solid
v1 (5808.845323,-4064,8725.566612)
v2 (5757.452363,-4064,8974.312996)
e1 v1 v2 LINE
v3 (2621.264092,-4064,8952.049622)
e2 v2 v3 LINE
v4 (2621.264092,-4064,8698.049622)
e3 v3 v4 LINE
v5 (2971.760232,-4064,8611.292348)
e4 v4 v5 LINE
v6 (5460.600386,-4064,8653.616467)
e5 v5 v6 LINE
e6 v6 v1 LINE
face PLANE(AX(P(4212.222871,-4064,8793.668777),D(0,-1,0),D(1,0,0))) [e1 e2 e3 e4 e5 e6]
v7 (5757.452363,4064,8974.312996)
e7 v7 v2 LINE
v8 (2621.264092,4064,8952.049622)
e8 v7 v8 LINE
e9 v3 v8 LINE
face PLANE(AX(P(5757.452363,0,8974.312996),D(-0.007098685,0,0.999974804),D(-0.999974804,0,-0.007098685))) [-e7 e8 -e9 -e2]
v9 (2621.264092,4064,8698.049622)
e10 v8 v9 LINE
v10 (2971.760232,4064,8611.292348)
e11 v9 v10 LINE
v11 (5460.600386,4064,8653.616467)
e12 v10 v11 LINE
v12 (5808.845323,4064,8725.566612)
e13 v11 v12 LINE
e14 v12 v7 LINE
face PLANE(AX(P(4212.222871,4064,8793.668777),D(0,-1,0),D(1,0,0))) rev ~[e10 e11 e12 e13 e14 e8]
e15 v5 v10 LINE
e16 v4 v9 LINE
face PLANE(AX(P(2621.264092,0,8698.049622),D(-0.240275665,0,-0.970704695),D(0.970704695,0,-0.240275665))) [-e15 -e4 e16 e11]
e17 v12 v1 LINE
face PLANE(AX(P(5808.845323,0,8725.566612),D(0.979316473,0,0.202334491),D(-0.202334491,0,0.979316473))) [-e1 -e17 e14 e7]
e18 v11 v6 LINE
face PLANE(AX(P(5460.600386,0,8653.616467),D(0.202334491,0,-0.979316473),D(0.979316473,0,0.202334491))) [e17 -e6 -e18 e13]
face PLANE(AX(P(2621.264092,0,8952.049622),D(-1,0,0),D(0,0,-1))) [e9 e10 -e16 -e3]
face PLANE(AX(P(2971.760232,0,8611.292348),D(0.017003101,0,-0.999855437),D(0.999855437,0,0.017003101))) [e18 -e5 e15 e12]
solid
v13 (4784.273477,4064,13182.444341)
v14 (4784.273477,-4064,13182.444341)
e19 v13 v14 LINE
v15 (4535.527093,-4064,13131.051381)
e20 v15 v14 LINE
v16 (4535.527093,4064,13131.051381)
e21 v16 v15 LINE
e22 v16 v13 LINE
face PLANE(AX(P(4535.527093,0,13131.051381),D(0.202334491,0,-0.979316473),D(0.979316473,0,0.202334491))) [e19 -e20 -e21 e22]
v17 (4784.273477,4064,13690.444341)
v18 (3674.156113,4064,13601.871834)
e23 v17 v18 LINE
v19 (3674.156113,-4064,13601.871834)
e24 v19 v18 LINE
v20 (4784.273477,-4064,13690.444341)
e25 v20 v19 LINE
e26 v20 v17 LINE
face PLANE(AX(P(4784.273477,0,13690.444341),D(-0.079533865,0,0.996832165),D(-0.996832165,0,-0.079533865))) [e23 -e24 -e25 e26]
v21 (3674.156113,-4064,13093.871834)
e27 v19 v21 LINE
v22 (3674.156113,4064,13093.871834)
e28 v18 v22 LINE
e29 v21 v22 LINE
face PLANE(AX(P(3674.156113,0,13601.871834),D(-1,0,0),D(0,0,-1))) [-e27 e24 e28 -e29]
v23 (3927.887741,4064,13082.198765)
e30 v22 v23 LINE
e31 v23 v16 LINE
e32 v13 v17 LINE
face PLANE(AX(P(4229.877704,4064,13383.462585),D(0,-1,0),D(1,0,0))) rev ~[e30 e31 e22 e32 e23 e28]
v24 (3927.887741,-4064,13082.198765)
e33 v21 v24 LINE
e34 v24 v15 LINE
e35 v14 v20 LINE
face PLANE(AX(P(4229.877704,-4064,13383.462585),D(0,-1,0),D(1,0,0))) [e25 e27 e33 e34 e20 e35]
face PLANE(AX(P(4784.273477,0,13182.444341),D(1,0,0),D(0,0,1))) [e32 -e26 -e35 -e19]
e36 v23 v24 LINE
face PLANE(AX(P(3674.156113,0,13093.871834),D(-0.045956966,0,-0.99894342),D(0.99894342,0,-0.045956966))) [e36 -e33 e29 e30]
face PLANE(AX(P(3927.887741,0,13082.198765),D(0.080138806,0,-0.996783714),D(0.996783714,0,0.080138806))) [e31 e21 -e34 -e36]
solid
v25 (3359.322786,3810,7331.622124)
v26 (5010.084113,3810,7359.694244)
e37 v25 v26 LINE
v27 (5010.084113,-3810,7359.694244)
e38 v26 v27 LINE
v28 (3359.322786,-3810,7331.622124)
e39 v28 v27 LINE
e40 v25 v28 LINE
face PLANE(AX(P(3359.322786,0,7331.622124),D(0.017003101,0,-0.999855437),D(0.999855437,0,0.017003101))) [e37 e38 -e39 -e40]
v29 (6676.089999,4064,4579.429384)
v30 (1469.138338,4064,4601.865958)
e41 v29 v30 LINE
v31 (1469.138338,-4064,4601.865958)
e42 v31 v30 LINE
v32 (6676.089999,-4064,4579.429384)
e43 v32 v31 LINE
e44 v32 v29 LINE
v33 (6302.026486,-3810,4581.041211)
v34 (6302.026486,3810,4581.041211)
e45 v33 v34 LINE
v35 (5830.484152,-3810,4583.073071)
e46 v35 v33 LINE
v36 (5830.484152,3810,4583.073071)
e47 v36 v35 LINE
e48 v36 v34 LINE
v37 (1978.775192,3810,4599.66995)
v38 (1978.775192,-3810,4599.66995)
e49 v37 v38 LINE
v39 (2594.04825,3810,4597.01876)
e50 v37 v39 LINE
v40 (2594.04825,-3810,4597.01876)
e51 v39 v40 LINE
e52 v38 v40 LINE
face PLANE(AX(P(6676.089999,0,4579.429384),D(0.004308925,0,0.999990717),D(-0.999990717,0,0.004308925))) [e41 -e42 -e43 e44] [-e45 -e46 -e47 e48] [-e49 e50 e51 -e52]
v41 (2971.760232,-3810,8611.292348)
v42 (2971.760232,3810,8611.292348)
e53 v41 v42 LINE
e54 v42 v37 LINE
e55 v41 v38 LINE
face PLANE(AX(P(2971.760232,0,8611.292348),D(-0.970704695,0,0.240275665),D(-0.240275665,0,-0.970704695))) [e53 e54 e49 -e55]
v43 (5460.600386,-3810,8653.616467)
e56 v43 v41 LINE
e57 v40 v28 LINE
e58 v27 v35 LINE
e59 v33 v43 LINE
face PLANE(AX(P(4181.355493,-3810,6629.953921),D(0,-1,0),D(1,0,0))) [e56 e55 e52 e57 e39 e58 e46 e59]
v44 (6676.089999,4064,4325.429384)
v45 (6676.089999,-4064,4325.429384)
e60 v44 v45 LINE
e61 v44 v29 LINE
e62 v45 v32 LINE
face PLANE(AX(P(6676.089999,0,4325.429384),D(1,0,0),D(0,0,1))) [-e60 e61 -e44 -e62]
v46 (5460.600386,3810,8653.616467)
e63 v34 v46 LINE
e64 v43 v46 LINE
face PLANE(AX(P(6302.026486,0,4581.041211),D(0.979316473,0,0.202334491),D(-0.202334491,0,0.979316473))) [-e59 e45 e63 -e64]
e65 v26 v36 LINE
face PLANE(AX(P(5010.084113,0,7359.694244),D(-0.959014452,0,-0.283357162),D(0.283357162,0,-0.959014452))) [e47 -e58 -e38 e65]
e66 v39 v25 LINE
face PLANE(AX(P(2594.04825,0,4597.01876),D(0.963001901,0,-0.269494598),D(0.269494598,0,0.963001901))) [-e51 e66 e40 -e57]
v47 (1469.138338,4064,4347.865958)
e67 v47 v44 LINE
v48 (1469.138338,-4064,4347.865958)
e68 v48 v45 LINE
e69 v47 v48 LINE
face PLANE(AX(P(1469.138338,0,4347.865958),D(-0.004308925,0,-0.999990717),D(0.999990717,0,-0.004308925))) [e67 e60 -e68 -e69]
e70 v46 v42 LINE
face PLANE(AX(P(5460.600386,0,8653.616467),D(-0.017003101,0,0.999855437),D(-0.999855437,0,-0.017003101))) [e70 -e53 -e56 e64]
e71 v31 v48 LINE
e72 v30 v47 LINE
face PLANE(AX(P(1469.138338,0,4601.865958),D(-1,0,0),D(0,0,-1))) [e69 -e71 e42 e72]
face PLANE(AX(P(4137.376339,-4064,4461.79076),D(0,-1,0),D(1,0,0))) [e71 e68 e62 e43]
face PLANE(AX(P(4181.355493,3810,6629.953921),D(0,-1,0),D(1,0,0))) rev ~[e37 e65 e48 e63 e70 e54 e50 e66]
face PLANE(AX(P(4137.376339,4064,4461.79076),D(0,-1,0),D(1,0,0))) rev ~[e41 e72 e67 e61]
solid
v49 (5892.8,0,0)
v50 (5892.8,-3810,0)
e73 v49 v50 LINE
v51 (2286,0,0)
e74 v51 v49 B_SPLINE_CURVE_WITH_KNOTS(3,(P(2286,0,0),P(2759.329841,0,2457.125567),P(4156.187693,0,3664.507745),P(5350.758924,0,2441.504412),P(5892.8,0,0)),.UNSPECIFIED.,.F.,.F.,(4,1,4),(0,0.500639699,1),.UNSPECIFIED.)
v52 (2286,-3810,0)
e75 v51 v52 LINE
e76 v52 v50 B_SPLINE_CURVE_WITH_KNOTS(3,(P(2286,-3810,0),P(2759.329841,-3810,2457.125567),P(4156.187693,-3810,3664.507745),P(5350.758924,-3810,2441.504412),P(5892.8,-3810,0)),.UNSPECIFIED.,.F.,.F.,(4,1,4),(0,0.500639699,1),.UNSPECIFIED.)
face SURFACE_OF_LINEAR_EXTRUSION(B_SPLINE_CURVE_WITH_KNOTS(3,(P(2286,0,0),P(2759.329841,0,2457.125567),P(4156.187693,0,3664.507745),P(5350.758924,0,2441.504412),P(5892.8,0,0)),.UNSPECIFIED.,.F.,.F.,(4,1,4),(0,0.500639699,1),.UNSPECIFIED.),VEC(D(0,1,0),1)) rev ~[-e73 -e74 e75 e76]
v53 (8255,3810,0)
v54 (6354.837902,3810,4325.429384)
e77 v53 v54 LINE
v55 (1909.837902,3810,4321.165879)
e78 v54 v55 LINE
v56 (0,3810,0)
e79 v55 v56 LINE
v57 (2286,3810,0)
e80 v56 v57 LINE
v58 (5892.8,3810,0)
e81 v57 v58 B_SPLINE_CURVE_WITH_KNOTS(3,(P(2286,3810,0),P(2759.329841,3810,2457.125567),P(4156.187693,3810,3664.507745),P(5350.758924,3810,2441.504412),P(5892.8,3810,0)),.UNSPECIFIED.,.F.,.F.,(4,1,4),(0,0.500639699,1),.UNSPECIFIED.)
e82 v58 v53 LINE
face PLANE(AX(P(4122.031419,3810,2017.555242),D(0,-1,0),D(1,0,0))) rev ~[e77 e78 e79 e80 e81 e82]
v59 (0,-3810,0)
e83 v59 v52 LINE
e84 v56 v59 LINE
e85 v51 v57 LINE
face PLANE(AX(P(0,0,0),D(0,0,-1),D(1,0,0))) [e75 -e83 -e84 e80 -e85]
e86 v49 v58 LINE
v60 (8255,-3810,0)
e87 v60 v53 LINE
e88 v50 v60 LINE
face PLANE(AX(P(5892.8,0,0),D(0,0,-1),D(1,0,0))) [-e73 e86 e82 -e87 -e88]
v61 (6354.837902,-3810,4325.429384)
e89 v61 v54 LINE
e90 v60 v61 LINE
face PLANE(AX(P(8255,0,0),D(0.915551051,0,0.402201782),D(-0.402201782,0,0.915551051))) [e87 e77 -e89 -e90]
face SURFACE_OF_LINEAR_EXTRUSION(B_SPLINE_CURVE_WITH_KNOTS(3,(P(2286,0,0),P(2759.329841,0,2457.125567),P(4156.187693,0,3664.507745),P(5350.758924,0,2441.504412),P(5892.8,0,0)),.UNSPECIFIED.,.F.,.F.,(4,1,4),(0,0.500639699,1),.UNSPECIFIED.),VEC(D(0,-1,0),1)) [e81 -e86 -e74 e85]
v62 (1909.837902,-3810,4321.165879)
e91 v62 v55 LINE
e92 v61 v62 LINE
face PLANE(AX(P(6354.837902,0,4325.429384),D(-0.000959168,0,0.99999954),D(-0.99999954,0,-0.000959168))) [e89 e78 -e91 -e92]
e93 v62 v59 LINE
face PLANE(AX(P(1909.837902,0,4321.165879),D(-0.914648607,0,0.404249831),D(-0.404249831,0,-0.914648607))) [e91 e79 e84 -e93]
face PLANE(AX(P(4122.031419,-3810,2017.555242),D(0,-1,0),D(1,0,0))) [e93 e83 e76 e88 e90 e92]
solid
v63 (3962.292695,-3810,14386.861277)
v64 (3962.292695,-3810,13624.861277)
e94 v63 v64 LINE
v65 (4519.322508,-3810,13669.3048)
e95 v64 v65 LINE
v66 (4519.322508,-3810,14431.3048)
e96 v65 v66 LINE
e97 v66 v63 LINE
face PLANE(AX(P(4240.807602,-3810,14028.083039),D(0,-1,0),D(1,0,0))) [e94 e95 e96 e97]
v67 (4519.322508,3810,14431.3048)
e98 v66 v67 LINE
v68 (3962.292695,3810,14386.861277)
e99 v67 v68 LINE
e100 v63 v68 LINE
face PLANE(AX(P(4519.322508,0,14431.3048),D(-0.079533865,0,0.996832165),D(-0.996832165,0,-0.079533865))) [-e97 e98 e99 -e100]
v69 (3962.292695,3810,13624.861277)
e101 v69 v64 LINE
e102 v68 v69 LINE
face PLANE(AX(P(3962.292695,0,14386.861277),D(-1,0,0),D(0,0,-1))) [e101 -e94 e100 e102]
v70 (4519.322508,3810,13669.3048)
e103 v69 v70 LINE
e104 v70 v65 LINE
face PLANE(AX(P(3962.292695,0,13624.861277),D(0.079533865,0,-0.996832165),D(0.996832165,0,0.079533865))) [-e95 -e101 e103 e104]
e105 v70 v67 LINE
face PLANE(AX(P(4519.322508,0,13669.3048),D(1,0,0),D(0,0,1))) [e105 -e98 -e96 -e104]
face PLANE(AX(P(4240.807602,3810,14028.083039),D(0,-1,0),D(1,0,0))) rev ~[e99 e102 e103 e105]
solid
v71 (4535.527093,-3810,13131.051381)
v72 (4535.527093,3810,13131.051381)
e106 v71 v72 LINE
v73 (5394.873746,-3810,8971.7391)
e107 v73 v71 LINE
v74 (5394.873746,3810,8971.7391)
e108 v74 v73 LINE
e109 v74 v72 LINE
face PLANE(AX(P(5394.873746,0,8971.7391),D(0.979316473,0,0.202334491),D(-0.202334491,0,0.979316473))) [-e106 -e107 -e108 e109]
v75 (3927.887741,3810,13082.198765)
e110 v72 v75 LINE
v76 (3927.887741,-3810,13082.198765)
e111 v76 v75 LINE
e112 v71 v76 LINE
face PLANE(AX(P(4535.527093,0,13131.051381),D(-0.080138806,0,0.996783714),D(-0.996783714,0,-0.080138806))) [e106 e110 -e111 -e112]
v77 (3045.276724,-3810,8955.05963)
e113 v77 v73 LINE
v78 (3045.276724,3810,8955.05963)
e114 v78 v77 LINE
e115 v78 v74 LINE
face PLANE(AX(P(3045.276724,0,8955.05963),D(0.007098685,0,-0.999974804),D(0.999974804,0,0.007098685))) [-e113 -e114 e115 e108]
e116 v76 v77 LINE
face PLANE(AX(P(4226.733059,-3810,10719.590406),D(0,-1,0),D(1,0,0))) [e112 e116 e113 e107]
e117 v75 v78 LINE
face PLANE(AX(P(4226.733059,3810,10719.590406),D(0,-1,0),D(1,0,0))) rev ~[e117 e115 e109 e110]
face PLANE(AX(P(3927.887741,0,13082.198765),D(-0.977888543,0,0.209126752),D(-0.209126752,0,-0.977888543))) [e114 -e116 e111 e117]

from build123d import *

# Parameters (mm, degrees)
F1_DEPTH = 3810
F2_DEPTH = 4064
F3_DEPTH = 4064


with BuildPart() as f1:
    # F0 (on Front) → F1 (new body, symmetric)
    with BuildSketch(Plane.XZ):
        Polygon((3962.2926947661, 14386.861276684), (3962.2926947661, 13624.861276684), (4519.3225083359, 13669.3048003329), (4519.3225083359, 14431.3048003329), align=None)
    extrude(amount=F1_DEPTH, both=True)


with BuildPart() as f1b:
    # F0 (on Front) → F1, piece 2 (new body, symmetric)
    with BuildSketch(Plane.XZ):
        Polygon((3927.887741484, 13082.1987645631), (3045.2767241419, 8955.0596301024), (5394.8737459492, 8971.7391000787), (4535.5270933105, 13131.0513807869), align=None)
    extrude(amount=F1_DEPTH, both=True)


with BuildPart() as f1c:
    # F0 (on Front) → F1, piece 3 (new body, symmetric)
    with BuildSketch(Plane.XZ):
        Polygon((2971.7602322705, 8611.2923479486), (1978.7751916019, 4599.6699502344), (2594.0482501344, 4597.0187600642), (3359.3227863312, 7331.6221237183), (5010.0841125311, 7359.6942437446), (5830.4841524302, 4583.0730705337), (6302.0264863643, 4581.0412110475), (5460.600385618, 8653.6164673729), align=None)
    extrude(amount=F1_DEPTH, both=True)

    # F0 (on Front) → F2 (join, symmetric)
    with BuildSketch(Plane.XZ):
        Polygon((1978.7751916019, 4599.6699502344), (1915.9703087599, 4345.9405742862), (6354.5516468159, 4326.8148819613), (6302.0264863643, 4581.0412110475), (5830.4841524302, 4583.0730705337), (2594.0482501344, 4597.0187600642), align=None)
        Polygon((1469.138337915, 4347.8659576788), (1915.9703087599, 4345.9405742862), (1978.7751916019, 4599.6699502344), (1469.138337915, 4601.8659576788), align=None)
        Polygon((6302.0264863643, 4581.0412110475), (6354.5516468159, 4326.8148819613), (6676.0899989331, 4325.4293844059), (6676.0899989331, 4579.4293844059), align=None)
    extrude(amount=F2_DEPTH, both=True)


with BuildPart() as f1d:
    # F0 (on Front) → F1, piece 4 (new body, symmetric)
    with BuildSketch(Plane.XZ):
        with BuildLine():
            Line((1909.8379015153, 4321.1658785489), (0, 0))
            Line((0, 0), (2286, 0))
            add(Edge.make_bspline(
                [(2286, 0), (2759.3298407348, 2457.1255667936), (4156.1876931975, 3664.5077452441), (5350.7589243341, 2441.5044118267), (5892.8, 0)],
                knots=[0, 0, 0, 0, 0.5006396986, 1, 1, 1, 1], degree=3))
            Line((5892.8, 0), (8255, 0))
            Line((8255, 0), (6354.8379015153, 4325.4293844059))
            Line((6354.8379015153, 4325.4293844059), (1909.8379015153, 4321.1658785489))
        make_face()
    extrude(amount=F1_DEPTH, both=True)


with BuildPart() as f3:
    # F0 (on Front) → F3 (new body, symmetric)
    with BuildSketch(Plane.XZ):
        Polygon((3045.2767241419, 8955.0596301024), (2971.7602322705, 8611.2923479486), (5460.600385618, 8653.6164673729), (5394.8737459492, 8971.7391000787), align=None)
        Polygon((5394.8737459492, 8971.7391000787), (5460.600385618, 8653.6164673729), (5808.845323328, 8725.5666123301), (5757.4523626443, 8974.3129964087), align=None)
        Polygon((2621.2640921677, 8698.0496220461), (2971.7602322705, 8611.2923479486), (3045.2767241419, 8955.0596301024), (2621.2640921677, 8952.0496220461), align=None)
    extrude(amount=F3_DEPTH, both=True)


with BuildPart() as f3b:
    # F0 (on Front) → F3, piece 2 (new body, symmetric)
    with BuildSketch(Plane.XZ):
        Polygon((3674.1561126888, 13093.8718339509), (3927.887741484, 13082.1987645631), (4535.5270933105, 13131.0513807869), (4784.2734773891, 13182.4443414707), (4784.2734773891, 13690.4443414707), (4519.3225083359, 13669.3048003329), (3962.2926947661, 13624.861276684), (3674.1561126888, 13601.8718339509), align=None)
    extrude(amount=F3_DEPTH, both=True)


solid = Compound([f1.part, f1b.part, f1c.part, f1d.part, f3.part, f3b.part])
